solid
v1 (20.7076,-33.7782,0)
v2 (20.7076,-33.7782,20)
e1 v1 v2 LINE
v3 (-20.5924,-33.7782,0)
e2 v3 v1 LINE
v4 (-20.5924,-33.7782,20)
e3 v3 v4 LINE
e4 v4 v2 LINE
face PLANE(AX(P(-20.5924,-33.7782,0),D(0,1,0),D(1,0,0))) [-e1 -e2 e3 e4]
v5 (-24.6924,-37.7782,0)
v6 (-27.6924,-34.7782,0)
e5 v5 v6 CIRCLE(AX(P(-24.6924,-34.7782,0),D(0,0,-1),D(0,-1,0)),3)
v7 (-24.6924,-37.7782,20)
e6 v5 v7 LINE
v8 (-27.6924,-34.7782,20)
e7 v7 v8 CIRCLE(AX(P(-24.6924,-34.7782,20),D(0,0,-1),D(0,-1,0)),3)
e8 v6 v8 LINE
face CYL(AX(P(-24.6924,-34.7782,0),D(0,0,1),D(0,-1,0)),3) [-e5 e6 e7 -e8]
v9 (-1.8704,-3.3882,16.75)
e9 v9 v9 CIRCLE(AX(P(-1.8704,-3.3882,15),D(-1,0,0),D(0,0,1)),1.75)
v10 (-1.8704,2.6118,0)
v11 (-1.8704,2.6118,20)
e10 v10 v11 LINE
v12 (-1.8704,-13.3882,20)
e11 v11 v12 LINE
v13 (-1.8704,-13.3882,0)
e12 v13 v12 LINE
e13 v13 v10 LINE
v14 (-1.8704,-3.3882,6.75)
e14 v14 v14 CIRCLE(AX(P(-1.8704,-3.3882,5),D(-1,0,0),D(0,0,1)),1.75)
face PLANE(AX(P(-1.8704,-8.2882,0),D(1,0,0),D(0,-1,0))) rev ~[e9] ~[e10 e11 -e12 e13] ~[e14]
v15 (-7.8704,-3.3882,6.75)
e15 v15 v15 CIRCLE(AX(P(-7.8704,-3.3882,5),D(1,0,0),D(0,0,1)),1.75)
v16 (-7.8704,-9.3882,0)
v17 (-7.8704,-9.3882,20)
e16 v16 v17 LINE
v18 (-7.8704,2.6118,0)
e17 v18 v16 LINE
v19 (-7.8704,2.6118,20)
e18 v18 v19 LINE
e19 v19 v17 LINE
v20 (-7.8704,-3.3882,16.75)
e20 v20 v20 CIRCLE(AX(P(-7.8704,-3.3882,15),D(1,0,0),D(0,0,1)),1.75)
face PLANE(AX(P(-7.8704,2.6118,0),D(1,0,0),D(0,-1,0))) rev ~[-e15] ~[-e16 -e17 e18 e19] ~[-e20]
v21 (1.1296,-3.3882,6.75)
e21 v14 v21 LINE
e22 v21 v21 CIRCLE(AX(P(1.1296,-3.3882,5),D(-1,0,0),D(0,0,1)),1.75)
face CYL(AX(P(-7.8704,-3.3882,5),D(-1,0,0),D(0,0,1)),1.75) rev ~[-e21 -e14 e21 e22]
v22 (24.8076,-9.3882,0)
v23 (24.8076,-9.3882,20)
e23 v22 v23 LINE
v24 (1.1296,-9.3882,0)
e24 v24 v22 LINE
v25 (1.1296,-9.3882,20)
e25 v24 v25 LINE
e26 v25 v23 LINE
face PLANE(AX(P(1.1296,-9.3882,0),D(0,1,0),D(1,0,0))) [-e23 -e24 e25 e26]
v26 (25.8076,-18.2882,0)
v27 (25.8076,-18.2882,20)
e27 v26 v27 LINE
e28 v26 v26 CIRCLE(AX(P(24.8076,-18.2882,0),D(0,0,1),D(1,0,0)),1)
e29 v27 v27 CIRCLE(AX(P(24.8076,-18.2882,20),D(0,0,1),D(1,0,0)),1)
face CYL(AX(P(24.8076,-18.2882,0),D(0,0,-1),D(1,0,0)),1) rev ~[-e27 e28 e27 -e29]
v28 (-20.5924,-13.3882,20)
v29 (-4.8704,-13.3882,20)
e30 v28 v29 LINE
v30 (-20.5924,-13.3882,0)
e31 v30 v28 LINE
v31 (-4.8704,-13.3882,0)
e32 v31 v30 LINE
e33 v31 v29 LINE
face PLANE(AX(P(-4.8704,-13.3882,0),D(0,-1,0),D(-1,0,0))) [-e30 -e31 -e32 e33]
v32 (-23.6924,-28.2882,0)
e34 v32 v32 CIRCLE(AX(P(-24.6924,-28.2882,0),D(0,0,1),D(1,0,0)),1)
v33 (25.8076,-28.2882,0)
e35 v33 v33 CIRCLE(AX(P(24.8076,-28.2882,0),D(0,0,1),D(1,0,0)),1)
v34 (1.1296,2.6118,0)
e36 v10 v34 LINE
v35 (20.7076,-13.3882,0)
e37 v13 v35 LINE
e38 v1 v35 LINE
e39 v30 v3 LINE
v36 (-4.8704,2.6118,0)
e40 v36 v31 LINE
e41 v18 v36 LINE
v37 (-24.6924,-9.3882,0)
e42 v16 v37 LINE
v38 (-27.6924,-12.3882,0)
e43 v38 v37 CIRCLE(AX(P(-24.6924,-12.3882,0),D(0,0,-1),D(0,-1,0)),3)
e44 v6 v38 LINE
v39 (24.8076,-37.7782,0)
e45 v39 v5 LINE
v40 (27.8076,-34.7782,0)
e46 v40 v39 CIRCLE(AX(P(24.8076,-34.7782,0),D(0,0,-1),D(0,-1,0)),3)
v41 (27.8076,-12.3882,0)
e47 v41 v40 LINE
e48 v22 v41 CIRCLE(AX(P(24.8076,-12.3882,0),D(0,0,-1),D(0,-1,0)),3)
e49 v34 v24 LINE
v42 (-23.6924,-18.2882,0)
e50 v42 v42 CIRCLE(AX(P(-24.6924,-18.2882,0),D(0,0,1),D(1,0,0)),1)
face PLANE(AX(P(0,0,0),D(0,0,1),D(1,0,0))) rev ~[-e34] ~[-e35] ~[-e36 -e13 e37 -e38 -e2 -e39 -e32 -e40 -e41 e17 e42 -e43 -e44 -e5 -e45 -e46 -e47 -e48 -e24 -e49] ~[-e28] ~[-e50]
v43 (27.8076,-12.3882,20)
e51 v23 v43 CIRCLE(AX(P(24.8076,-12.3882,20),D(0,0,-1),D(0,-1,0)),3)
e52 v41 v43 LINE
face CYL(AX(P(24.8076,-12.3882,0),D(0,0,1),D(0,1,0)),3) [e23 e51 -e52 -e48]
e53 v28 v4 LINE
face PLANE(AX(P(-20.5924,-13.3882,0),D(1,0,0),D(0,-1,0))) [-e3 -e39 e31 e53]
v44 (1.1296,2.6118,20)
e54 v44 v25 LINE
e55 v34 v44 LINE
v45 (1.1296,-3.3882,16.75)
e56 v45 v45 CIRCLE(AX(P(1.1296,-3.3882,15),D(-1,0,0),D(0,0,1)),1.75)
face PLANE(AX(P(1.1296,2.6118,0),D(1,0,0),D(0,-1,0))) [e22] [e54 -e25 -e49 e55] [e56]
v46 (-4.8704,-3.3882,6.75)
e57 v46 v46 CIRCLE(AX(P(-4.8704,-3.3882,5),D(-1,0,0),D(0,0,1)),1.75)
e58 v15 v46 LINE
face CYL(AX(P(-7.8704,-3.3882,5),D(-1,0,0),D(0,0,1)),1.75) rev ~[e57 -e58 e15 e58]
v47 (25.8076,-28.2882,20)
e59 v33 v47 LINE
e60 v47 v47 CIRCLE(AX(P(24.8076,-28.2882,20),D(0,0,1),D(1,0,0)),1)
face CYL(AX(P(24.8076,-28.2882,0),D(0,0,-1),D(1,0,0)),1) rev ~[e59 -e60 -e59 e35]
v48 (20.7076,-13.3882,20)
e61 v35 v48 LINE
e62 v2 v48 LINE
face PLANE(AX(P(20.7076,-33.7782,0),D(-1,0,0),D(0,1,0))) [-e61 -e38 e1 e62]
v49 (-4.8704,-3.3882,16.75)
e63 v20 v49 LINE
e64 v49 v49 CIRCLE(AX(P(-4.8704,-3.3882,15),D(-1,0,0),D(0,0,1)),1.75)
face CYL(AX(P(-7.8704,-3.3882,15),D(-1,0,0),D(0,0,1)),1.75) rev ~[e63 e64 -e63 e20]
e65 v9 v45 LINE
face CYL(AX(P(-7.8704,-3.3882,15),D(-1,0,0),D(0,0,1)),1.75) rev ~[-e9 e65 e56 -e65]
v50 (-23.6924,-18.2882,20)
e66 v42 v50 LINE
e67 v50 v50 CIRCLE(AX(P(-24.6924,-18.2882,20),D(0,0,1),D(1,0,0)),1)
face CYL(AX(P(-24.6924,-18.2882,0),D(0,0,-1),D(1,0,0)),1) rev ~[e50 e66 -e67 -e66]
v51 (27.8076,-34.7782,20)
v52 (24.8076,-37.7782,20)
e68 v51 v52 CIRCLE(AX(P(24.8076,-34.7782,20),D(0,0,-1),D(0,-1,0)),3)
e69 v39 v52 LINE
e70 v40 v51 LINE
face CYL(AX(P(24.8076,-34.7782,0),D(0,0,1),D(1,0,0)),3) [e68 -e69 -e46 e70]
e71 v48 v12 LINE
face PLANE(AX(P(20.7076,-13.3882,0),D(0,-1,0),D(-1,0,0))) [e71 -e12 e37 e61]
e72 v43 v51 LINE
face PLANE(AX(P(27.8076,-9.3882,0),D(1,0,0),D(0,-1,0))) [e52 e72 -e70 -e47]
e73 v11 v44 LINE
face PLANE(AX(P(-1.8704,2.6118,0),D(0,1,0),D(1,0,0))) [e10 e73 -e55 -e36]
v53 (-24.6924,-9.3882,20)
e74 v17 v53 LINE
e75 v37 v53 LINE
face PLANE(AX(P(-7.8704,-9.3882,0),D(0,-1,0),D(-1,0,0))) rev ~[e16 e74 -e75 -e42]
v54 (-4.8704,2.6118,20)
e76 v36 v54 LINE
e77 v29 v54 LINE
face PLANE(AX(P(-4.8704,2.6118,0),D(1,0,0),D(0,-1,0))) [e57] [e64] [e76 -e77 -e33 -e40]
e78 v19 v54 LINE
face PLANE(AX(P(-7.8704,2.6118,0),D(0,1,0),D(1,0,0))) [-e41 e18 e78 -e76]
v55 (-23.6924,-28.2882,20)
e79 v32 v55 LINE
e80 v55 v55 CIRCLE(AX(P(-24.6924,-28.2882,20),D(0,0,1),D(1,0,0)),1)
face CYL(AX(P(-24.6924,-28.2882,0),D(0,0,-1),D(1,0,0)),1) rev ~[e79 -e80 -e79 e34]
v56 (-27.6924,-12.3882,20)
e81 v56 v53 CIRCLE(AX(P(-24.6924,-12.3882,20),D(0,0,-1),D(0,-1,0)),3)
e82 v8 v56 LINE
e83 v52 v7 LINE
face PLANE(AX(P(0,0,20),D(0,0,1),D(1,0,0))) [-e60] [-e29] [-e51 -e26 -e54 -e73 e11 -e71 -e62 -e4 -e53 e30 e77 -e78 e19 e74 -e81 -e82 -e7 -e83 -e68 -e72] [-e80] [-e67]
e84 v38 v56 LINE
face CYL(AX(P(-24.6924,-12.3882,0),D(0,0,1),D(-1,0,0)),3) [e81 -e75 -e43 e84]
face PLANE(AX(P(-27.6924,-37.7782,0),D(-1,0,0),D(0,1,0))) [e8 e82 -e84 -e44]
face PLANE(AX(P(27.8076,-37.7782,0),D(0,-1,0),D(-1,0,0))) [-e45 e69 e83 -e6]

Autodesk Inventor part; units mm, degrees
ref_plane "YZ Plane" through (0, 0, 0) normal (1, 0, 0) x (0, 1, 0)
ref_plane "XZ Plane" through (0, 0, 0) normal (0, 1, 0) x (-1, 0, 0)
ref_plane "XY Plane" through (0, 0, 0) normal (0, 0, 1) x (1, 0, 0)
sketch "Block1" plane through (0, 0, 0) normal (0, 0, 1) x (1, 0, 0)
  line L0 (-1.8704, 39.5395) -> (-1.8704, -10.4605)
  line L1 (-4.8704, 39.5395) -> (-4.8704, -10.4605)
  arc A0 (25.8721, -18.7556) -> (25.8721, -22.1655) centre (24.8076, -20.4605) ccw
  arc A1 (25.8721, -28.7556) -> (25.8721, -32.1655) centre (24.8076, -30.4605) ccw
  arc A2 (-25.7569, -32.1655) -> (-25.7569, -28.7556) centre (-24.6924, -30.4605) ccw
  arc A3 (-25.7569, -22.1655) -> (-25.7569, -18.7556) centre (-24.6924, -20.4605) ccw
  line L2 (10.765, -35.4505) -> (20.1076, -35.4505)
  line L3 (20.2076, -15.5605) -> (20.2076, -35.3605)
  line L4 (-20.0924, -15.5605) -> (-20.0924, -35.3605)
  point P0 (0.9099, -18.4595)
sketch "Sketch1" plane through (0, 0, 0) normal (0, 0, 1) x (1, 0, 0)
  circle A0 centre (24.8076, -18.2882) radius 1
  circle A1 centre (24.8076, -28.2882) radius 1
  circle A2 centre (-24.6924, -28.2882) radius 1
  circle A3 centre (-24.6924, -18.2882) radius 1
  line L0 (20.7076, -13.3882) -> (-20.5924, -13.3882)
  line L1 (-20.5924, -13.3882) -> (-20.5924, -33.7782)
  line L2 (-20.5924, -33.7782) -> (20.7076, -33.7782)
  line L3 (20.7076, -33.7782) -> (20.7076, -13.3882)
  line L4 (27.8076, -37.7782) -> (-27.6924, -37.7782)
  line L5 (-27.6924, -37.7782) -> (-27.6924, 2.6118)
  line L6 (-27.6924, 2.6118) -> (27.8076, 2.6118)
  line L7 (27.8076, 2.6118) -> (27.8076, -37.7782)
  line L8 (-1.8704, -8.2882) -> (-1.8704, -13.3882)
  line L9 (-4.8704, -8.2882) -> (-4.8704, -13.3882)
  line L10 (-27.6924, 2.6118) -> (-7.8704, 2.6118)
  line L11 (-7.8704, 2.6118) -> (-7.8704, -9.3882)
  line L12 (-7.8704, -9.3882) -> (-27.6924, -9.3882)
  line L13 (-27.6924, -9.3882) -> (-27.6924, 2.6118)
  line L14 (27.8076, 2.6118) -> (1.1296, 2.6118)
  line L15 (1.1296, 2.6118) -> (1.1296, -9.3882)
  line L16 (1.1296, -9.3882) -> (27.8076, -9.3882)
  line L17 (27.8076, -9.3882) -> (27.8076, 2.6118)
  line L18 (-1.8704, 41.7118) -> (-1.8704, -8.2882)
  line L19 (-4.8704, 41.7118) -> (-4.8704, -8.2882)
  arc A4 (25.8721, -16.5832) -> (25.8721, -19.9932) centre (24.8076, -18.2882) ccw
  arc A5 (25.8721, -26.5832) -> (25.8721, -29.9932) centre (24.8076, -28.2882) ccw
  arc A6 (-25.7569, -29.9932) -> (-25.7569, -26.5832) centre (-24.6924, -28.2882) ccw
  arc A7 (-25.7569, -19.9932) -> (-25.7569, -16.5832) centre (-24.6924, -18.2882) ccw
  line L20 (10.765, -33.2782) -> (20.1076, -33.2782)
  line L21 (20.2076, -13.3882) -> (20.2076, -33.1882)
  line L22 (-20.0924, -13.3882) -> (-20.0924, -33.1882)
  point P0 (0, 0)
  point P1 (15.4363, -33.2782)
  point P2 (-4.8704, -8.2882)
  point P3 (-4.8704, 2.6118)
  point P4 (-1.8704, 2.6118)
  point P5 (-1.8704, -8.2882)
  dimension "d0" = 2
  dimension "d1" = 2
  dimension "d2" = 2
  dimension "d3" = 2
  dimension "d4" = 0.5
  dimension "d5" = 0.5
  dimension "d6" = 0.5
  dimension "d7" = 3
  dimension "d8" = 3
  dimension "d9" = 3
  dimension "d10" = 3
  dimension "d11" = 12
  dimension "d12" = 12
  dimension "d13" = 4
  dimension "d14" = 4
extrude "Extrusion1" add sketch "Sketch1" along normal blind 20 contours L0 L8 L18 L6 L15 L16 L7 L4 L5 L12 L11 L19 L9 L1 L2 L3
sketch "Sketch2" plane through (-7.8704, -9.3882, 0) normal (-1, 0, 0) x (0, 0, 1)
  line L0 (0, 12) -> (0, 0) projected
  line L1 (0, 0) -> (20, 0) projected
  line L2 (20, 12) -> (20, 0) projected
  line L3 (0, 12) -> (20, 12) projected
  line L4 (20, 6) -> (0, 6)
  line L5 (0, -4) -> (0, 12) projected
  circle A0 centre (15, 6) radius 1.75
  circle A1 centre (5, 6) radius 1.75
  point P0 (0, 9.3882)
  dimension "d17" = 3.5
  dimension "d18" = 3.5
  dimension "d19" = 10
  dimension "d20" = 20
  dimension "d21" = 5
extrude "Extrusion2" cut sketch "Sketch2" against normal blind 20 contours A1 L4 | L4 A1 | A0 L4 | L4 A0
fillet "Fillet1" radius 3 4 edges at (27.8076, -9.3882, 10) (27.8076, -37.7782, 10) (-27.6924, -37.7782, 10) (-27.6924, -9.3882, 10)
equation "\"d6\" = d4"
equation "\"d12\" = d11"
properties part number "Servo mount_3DPrint"
